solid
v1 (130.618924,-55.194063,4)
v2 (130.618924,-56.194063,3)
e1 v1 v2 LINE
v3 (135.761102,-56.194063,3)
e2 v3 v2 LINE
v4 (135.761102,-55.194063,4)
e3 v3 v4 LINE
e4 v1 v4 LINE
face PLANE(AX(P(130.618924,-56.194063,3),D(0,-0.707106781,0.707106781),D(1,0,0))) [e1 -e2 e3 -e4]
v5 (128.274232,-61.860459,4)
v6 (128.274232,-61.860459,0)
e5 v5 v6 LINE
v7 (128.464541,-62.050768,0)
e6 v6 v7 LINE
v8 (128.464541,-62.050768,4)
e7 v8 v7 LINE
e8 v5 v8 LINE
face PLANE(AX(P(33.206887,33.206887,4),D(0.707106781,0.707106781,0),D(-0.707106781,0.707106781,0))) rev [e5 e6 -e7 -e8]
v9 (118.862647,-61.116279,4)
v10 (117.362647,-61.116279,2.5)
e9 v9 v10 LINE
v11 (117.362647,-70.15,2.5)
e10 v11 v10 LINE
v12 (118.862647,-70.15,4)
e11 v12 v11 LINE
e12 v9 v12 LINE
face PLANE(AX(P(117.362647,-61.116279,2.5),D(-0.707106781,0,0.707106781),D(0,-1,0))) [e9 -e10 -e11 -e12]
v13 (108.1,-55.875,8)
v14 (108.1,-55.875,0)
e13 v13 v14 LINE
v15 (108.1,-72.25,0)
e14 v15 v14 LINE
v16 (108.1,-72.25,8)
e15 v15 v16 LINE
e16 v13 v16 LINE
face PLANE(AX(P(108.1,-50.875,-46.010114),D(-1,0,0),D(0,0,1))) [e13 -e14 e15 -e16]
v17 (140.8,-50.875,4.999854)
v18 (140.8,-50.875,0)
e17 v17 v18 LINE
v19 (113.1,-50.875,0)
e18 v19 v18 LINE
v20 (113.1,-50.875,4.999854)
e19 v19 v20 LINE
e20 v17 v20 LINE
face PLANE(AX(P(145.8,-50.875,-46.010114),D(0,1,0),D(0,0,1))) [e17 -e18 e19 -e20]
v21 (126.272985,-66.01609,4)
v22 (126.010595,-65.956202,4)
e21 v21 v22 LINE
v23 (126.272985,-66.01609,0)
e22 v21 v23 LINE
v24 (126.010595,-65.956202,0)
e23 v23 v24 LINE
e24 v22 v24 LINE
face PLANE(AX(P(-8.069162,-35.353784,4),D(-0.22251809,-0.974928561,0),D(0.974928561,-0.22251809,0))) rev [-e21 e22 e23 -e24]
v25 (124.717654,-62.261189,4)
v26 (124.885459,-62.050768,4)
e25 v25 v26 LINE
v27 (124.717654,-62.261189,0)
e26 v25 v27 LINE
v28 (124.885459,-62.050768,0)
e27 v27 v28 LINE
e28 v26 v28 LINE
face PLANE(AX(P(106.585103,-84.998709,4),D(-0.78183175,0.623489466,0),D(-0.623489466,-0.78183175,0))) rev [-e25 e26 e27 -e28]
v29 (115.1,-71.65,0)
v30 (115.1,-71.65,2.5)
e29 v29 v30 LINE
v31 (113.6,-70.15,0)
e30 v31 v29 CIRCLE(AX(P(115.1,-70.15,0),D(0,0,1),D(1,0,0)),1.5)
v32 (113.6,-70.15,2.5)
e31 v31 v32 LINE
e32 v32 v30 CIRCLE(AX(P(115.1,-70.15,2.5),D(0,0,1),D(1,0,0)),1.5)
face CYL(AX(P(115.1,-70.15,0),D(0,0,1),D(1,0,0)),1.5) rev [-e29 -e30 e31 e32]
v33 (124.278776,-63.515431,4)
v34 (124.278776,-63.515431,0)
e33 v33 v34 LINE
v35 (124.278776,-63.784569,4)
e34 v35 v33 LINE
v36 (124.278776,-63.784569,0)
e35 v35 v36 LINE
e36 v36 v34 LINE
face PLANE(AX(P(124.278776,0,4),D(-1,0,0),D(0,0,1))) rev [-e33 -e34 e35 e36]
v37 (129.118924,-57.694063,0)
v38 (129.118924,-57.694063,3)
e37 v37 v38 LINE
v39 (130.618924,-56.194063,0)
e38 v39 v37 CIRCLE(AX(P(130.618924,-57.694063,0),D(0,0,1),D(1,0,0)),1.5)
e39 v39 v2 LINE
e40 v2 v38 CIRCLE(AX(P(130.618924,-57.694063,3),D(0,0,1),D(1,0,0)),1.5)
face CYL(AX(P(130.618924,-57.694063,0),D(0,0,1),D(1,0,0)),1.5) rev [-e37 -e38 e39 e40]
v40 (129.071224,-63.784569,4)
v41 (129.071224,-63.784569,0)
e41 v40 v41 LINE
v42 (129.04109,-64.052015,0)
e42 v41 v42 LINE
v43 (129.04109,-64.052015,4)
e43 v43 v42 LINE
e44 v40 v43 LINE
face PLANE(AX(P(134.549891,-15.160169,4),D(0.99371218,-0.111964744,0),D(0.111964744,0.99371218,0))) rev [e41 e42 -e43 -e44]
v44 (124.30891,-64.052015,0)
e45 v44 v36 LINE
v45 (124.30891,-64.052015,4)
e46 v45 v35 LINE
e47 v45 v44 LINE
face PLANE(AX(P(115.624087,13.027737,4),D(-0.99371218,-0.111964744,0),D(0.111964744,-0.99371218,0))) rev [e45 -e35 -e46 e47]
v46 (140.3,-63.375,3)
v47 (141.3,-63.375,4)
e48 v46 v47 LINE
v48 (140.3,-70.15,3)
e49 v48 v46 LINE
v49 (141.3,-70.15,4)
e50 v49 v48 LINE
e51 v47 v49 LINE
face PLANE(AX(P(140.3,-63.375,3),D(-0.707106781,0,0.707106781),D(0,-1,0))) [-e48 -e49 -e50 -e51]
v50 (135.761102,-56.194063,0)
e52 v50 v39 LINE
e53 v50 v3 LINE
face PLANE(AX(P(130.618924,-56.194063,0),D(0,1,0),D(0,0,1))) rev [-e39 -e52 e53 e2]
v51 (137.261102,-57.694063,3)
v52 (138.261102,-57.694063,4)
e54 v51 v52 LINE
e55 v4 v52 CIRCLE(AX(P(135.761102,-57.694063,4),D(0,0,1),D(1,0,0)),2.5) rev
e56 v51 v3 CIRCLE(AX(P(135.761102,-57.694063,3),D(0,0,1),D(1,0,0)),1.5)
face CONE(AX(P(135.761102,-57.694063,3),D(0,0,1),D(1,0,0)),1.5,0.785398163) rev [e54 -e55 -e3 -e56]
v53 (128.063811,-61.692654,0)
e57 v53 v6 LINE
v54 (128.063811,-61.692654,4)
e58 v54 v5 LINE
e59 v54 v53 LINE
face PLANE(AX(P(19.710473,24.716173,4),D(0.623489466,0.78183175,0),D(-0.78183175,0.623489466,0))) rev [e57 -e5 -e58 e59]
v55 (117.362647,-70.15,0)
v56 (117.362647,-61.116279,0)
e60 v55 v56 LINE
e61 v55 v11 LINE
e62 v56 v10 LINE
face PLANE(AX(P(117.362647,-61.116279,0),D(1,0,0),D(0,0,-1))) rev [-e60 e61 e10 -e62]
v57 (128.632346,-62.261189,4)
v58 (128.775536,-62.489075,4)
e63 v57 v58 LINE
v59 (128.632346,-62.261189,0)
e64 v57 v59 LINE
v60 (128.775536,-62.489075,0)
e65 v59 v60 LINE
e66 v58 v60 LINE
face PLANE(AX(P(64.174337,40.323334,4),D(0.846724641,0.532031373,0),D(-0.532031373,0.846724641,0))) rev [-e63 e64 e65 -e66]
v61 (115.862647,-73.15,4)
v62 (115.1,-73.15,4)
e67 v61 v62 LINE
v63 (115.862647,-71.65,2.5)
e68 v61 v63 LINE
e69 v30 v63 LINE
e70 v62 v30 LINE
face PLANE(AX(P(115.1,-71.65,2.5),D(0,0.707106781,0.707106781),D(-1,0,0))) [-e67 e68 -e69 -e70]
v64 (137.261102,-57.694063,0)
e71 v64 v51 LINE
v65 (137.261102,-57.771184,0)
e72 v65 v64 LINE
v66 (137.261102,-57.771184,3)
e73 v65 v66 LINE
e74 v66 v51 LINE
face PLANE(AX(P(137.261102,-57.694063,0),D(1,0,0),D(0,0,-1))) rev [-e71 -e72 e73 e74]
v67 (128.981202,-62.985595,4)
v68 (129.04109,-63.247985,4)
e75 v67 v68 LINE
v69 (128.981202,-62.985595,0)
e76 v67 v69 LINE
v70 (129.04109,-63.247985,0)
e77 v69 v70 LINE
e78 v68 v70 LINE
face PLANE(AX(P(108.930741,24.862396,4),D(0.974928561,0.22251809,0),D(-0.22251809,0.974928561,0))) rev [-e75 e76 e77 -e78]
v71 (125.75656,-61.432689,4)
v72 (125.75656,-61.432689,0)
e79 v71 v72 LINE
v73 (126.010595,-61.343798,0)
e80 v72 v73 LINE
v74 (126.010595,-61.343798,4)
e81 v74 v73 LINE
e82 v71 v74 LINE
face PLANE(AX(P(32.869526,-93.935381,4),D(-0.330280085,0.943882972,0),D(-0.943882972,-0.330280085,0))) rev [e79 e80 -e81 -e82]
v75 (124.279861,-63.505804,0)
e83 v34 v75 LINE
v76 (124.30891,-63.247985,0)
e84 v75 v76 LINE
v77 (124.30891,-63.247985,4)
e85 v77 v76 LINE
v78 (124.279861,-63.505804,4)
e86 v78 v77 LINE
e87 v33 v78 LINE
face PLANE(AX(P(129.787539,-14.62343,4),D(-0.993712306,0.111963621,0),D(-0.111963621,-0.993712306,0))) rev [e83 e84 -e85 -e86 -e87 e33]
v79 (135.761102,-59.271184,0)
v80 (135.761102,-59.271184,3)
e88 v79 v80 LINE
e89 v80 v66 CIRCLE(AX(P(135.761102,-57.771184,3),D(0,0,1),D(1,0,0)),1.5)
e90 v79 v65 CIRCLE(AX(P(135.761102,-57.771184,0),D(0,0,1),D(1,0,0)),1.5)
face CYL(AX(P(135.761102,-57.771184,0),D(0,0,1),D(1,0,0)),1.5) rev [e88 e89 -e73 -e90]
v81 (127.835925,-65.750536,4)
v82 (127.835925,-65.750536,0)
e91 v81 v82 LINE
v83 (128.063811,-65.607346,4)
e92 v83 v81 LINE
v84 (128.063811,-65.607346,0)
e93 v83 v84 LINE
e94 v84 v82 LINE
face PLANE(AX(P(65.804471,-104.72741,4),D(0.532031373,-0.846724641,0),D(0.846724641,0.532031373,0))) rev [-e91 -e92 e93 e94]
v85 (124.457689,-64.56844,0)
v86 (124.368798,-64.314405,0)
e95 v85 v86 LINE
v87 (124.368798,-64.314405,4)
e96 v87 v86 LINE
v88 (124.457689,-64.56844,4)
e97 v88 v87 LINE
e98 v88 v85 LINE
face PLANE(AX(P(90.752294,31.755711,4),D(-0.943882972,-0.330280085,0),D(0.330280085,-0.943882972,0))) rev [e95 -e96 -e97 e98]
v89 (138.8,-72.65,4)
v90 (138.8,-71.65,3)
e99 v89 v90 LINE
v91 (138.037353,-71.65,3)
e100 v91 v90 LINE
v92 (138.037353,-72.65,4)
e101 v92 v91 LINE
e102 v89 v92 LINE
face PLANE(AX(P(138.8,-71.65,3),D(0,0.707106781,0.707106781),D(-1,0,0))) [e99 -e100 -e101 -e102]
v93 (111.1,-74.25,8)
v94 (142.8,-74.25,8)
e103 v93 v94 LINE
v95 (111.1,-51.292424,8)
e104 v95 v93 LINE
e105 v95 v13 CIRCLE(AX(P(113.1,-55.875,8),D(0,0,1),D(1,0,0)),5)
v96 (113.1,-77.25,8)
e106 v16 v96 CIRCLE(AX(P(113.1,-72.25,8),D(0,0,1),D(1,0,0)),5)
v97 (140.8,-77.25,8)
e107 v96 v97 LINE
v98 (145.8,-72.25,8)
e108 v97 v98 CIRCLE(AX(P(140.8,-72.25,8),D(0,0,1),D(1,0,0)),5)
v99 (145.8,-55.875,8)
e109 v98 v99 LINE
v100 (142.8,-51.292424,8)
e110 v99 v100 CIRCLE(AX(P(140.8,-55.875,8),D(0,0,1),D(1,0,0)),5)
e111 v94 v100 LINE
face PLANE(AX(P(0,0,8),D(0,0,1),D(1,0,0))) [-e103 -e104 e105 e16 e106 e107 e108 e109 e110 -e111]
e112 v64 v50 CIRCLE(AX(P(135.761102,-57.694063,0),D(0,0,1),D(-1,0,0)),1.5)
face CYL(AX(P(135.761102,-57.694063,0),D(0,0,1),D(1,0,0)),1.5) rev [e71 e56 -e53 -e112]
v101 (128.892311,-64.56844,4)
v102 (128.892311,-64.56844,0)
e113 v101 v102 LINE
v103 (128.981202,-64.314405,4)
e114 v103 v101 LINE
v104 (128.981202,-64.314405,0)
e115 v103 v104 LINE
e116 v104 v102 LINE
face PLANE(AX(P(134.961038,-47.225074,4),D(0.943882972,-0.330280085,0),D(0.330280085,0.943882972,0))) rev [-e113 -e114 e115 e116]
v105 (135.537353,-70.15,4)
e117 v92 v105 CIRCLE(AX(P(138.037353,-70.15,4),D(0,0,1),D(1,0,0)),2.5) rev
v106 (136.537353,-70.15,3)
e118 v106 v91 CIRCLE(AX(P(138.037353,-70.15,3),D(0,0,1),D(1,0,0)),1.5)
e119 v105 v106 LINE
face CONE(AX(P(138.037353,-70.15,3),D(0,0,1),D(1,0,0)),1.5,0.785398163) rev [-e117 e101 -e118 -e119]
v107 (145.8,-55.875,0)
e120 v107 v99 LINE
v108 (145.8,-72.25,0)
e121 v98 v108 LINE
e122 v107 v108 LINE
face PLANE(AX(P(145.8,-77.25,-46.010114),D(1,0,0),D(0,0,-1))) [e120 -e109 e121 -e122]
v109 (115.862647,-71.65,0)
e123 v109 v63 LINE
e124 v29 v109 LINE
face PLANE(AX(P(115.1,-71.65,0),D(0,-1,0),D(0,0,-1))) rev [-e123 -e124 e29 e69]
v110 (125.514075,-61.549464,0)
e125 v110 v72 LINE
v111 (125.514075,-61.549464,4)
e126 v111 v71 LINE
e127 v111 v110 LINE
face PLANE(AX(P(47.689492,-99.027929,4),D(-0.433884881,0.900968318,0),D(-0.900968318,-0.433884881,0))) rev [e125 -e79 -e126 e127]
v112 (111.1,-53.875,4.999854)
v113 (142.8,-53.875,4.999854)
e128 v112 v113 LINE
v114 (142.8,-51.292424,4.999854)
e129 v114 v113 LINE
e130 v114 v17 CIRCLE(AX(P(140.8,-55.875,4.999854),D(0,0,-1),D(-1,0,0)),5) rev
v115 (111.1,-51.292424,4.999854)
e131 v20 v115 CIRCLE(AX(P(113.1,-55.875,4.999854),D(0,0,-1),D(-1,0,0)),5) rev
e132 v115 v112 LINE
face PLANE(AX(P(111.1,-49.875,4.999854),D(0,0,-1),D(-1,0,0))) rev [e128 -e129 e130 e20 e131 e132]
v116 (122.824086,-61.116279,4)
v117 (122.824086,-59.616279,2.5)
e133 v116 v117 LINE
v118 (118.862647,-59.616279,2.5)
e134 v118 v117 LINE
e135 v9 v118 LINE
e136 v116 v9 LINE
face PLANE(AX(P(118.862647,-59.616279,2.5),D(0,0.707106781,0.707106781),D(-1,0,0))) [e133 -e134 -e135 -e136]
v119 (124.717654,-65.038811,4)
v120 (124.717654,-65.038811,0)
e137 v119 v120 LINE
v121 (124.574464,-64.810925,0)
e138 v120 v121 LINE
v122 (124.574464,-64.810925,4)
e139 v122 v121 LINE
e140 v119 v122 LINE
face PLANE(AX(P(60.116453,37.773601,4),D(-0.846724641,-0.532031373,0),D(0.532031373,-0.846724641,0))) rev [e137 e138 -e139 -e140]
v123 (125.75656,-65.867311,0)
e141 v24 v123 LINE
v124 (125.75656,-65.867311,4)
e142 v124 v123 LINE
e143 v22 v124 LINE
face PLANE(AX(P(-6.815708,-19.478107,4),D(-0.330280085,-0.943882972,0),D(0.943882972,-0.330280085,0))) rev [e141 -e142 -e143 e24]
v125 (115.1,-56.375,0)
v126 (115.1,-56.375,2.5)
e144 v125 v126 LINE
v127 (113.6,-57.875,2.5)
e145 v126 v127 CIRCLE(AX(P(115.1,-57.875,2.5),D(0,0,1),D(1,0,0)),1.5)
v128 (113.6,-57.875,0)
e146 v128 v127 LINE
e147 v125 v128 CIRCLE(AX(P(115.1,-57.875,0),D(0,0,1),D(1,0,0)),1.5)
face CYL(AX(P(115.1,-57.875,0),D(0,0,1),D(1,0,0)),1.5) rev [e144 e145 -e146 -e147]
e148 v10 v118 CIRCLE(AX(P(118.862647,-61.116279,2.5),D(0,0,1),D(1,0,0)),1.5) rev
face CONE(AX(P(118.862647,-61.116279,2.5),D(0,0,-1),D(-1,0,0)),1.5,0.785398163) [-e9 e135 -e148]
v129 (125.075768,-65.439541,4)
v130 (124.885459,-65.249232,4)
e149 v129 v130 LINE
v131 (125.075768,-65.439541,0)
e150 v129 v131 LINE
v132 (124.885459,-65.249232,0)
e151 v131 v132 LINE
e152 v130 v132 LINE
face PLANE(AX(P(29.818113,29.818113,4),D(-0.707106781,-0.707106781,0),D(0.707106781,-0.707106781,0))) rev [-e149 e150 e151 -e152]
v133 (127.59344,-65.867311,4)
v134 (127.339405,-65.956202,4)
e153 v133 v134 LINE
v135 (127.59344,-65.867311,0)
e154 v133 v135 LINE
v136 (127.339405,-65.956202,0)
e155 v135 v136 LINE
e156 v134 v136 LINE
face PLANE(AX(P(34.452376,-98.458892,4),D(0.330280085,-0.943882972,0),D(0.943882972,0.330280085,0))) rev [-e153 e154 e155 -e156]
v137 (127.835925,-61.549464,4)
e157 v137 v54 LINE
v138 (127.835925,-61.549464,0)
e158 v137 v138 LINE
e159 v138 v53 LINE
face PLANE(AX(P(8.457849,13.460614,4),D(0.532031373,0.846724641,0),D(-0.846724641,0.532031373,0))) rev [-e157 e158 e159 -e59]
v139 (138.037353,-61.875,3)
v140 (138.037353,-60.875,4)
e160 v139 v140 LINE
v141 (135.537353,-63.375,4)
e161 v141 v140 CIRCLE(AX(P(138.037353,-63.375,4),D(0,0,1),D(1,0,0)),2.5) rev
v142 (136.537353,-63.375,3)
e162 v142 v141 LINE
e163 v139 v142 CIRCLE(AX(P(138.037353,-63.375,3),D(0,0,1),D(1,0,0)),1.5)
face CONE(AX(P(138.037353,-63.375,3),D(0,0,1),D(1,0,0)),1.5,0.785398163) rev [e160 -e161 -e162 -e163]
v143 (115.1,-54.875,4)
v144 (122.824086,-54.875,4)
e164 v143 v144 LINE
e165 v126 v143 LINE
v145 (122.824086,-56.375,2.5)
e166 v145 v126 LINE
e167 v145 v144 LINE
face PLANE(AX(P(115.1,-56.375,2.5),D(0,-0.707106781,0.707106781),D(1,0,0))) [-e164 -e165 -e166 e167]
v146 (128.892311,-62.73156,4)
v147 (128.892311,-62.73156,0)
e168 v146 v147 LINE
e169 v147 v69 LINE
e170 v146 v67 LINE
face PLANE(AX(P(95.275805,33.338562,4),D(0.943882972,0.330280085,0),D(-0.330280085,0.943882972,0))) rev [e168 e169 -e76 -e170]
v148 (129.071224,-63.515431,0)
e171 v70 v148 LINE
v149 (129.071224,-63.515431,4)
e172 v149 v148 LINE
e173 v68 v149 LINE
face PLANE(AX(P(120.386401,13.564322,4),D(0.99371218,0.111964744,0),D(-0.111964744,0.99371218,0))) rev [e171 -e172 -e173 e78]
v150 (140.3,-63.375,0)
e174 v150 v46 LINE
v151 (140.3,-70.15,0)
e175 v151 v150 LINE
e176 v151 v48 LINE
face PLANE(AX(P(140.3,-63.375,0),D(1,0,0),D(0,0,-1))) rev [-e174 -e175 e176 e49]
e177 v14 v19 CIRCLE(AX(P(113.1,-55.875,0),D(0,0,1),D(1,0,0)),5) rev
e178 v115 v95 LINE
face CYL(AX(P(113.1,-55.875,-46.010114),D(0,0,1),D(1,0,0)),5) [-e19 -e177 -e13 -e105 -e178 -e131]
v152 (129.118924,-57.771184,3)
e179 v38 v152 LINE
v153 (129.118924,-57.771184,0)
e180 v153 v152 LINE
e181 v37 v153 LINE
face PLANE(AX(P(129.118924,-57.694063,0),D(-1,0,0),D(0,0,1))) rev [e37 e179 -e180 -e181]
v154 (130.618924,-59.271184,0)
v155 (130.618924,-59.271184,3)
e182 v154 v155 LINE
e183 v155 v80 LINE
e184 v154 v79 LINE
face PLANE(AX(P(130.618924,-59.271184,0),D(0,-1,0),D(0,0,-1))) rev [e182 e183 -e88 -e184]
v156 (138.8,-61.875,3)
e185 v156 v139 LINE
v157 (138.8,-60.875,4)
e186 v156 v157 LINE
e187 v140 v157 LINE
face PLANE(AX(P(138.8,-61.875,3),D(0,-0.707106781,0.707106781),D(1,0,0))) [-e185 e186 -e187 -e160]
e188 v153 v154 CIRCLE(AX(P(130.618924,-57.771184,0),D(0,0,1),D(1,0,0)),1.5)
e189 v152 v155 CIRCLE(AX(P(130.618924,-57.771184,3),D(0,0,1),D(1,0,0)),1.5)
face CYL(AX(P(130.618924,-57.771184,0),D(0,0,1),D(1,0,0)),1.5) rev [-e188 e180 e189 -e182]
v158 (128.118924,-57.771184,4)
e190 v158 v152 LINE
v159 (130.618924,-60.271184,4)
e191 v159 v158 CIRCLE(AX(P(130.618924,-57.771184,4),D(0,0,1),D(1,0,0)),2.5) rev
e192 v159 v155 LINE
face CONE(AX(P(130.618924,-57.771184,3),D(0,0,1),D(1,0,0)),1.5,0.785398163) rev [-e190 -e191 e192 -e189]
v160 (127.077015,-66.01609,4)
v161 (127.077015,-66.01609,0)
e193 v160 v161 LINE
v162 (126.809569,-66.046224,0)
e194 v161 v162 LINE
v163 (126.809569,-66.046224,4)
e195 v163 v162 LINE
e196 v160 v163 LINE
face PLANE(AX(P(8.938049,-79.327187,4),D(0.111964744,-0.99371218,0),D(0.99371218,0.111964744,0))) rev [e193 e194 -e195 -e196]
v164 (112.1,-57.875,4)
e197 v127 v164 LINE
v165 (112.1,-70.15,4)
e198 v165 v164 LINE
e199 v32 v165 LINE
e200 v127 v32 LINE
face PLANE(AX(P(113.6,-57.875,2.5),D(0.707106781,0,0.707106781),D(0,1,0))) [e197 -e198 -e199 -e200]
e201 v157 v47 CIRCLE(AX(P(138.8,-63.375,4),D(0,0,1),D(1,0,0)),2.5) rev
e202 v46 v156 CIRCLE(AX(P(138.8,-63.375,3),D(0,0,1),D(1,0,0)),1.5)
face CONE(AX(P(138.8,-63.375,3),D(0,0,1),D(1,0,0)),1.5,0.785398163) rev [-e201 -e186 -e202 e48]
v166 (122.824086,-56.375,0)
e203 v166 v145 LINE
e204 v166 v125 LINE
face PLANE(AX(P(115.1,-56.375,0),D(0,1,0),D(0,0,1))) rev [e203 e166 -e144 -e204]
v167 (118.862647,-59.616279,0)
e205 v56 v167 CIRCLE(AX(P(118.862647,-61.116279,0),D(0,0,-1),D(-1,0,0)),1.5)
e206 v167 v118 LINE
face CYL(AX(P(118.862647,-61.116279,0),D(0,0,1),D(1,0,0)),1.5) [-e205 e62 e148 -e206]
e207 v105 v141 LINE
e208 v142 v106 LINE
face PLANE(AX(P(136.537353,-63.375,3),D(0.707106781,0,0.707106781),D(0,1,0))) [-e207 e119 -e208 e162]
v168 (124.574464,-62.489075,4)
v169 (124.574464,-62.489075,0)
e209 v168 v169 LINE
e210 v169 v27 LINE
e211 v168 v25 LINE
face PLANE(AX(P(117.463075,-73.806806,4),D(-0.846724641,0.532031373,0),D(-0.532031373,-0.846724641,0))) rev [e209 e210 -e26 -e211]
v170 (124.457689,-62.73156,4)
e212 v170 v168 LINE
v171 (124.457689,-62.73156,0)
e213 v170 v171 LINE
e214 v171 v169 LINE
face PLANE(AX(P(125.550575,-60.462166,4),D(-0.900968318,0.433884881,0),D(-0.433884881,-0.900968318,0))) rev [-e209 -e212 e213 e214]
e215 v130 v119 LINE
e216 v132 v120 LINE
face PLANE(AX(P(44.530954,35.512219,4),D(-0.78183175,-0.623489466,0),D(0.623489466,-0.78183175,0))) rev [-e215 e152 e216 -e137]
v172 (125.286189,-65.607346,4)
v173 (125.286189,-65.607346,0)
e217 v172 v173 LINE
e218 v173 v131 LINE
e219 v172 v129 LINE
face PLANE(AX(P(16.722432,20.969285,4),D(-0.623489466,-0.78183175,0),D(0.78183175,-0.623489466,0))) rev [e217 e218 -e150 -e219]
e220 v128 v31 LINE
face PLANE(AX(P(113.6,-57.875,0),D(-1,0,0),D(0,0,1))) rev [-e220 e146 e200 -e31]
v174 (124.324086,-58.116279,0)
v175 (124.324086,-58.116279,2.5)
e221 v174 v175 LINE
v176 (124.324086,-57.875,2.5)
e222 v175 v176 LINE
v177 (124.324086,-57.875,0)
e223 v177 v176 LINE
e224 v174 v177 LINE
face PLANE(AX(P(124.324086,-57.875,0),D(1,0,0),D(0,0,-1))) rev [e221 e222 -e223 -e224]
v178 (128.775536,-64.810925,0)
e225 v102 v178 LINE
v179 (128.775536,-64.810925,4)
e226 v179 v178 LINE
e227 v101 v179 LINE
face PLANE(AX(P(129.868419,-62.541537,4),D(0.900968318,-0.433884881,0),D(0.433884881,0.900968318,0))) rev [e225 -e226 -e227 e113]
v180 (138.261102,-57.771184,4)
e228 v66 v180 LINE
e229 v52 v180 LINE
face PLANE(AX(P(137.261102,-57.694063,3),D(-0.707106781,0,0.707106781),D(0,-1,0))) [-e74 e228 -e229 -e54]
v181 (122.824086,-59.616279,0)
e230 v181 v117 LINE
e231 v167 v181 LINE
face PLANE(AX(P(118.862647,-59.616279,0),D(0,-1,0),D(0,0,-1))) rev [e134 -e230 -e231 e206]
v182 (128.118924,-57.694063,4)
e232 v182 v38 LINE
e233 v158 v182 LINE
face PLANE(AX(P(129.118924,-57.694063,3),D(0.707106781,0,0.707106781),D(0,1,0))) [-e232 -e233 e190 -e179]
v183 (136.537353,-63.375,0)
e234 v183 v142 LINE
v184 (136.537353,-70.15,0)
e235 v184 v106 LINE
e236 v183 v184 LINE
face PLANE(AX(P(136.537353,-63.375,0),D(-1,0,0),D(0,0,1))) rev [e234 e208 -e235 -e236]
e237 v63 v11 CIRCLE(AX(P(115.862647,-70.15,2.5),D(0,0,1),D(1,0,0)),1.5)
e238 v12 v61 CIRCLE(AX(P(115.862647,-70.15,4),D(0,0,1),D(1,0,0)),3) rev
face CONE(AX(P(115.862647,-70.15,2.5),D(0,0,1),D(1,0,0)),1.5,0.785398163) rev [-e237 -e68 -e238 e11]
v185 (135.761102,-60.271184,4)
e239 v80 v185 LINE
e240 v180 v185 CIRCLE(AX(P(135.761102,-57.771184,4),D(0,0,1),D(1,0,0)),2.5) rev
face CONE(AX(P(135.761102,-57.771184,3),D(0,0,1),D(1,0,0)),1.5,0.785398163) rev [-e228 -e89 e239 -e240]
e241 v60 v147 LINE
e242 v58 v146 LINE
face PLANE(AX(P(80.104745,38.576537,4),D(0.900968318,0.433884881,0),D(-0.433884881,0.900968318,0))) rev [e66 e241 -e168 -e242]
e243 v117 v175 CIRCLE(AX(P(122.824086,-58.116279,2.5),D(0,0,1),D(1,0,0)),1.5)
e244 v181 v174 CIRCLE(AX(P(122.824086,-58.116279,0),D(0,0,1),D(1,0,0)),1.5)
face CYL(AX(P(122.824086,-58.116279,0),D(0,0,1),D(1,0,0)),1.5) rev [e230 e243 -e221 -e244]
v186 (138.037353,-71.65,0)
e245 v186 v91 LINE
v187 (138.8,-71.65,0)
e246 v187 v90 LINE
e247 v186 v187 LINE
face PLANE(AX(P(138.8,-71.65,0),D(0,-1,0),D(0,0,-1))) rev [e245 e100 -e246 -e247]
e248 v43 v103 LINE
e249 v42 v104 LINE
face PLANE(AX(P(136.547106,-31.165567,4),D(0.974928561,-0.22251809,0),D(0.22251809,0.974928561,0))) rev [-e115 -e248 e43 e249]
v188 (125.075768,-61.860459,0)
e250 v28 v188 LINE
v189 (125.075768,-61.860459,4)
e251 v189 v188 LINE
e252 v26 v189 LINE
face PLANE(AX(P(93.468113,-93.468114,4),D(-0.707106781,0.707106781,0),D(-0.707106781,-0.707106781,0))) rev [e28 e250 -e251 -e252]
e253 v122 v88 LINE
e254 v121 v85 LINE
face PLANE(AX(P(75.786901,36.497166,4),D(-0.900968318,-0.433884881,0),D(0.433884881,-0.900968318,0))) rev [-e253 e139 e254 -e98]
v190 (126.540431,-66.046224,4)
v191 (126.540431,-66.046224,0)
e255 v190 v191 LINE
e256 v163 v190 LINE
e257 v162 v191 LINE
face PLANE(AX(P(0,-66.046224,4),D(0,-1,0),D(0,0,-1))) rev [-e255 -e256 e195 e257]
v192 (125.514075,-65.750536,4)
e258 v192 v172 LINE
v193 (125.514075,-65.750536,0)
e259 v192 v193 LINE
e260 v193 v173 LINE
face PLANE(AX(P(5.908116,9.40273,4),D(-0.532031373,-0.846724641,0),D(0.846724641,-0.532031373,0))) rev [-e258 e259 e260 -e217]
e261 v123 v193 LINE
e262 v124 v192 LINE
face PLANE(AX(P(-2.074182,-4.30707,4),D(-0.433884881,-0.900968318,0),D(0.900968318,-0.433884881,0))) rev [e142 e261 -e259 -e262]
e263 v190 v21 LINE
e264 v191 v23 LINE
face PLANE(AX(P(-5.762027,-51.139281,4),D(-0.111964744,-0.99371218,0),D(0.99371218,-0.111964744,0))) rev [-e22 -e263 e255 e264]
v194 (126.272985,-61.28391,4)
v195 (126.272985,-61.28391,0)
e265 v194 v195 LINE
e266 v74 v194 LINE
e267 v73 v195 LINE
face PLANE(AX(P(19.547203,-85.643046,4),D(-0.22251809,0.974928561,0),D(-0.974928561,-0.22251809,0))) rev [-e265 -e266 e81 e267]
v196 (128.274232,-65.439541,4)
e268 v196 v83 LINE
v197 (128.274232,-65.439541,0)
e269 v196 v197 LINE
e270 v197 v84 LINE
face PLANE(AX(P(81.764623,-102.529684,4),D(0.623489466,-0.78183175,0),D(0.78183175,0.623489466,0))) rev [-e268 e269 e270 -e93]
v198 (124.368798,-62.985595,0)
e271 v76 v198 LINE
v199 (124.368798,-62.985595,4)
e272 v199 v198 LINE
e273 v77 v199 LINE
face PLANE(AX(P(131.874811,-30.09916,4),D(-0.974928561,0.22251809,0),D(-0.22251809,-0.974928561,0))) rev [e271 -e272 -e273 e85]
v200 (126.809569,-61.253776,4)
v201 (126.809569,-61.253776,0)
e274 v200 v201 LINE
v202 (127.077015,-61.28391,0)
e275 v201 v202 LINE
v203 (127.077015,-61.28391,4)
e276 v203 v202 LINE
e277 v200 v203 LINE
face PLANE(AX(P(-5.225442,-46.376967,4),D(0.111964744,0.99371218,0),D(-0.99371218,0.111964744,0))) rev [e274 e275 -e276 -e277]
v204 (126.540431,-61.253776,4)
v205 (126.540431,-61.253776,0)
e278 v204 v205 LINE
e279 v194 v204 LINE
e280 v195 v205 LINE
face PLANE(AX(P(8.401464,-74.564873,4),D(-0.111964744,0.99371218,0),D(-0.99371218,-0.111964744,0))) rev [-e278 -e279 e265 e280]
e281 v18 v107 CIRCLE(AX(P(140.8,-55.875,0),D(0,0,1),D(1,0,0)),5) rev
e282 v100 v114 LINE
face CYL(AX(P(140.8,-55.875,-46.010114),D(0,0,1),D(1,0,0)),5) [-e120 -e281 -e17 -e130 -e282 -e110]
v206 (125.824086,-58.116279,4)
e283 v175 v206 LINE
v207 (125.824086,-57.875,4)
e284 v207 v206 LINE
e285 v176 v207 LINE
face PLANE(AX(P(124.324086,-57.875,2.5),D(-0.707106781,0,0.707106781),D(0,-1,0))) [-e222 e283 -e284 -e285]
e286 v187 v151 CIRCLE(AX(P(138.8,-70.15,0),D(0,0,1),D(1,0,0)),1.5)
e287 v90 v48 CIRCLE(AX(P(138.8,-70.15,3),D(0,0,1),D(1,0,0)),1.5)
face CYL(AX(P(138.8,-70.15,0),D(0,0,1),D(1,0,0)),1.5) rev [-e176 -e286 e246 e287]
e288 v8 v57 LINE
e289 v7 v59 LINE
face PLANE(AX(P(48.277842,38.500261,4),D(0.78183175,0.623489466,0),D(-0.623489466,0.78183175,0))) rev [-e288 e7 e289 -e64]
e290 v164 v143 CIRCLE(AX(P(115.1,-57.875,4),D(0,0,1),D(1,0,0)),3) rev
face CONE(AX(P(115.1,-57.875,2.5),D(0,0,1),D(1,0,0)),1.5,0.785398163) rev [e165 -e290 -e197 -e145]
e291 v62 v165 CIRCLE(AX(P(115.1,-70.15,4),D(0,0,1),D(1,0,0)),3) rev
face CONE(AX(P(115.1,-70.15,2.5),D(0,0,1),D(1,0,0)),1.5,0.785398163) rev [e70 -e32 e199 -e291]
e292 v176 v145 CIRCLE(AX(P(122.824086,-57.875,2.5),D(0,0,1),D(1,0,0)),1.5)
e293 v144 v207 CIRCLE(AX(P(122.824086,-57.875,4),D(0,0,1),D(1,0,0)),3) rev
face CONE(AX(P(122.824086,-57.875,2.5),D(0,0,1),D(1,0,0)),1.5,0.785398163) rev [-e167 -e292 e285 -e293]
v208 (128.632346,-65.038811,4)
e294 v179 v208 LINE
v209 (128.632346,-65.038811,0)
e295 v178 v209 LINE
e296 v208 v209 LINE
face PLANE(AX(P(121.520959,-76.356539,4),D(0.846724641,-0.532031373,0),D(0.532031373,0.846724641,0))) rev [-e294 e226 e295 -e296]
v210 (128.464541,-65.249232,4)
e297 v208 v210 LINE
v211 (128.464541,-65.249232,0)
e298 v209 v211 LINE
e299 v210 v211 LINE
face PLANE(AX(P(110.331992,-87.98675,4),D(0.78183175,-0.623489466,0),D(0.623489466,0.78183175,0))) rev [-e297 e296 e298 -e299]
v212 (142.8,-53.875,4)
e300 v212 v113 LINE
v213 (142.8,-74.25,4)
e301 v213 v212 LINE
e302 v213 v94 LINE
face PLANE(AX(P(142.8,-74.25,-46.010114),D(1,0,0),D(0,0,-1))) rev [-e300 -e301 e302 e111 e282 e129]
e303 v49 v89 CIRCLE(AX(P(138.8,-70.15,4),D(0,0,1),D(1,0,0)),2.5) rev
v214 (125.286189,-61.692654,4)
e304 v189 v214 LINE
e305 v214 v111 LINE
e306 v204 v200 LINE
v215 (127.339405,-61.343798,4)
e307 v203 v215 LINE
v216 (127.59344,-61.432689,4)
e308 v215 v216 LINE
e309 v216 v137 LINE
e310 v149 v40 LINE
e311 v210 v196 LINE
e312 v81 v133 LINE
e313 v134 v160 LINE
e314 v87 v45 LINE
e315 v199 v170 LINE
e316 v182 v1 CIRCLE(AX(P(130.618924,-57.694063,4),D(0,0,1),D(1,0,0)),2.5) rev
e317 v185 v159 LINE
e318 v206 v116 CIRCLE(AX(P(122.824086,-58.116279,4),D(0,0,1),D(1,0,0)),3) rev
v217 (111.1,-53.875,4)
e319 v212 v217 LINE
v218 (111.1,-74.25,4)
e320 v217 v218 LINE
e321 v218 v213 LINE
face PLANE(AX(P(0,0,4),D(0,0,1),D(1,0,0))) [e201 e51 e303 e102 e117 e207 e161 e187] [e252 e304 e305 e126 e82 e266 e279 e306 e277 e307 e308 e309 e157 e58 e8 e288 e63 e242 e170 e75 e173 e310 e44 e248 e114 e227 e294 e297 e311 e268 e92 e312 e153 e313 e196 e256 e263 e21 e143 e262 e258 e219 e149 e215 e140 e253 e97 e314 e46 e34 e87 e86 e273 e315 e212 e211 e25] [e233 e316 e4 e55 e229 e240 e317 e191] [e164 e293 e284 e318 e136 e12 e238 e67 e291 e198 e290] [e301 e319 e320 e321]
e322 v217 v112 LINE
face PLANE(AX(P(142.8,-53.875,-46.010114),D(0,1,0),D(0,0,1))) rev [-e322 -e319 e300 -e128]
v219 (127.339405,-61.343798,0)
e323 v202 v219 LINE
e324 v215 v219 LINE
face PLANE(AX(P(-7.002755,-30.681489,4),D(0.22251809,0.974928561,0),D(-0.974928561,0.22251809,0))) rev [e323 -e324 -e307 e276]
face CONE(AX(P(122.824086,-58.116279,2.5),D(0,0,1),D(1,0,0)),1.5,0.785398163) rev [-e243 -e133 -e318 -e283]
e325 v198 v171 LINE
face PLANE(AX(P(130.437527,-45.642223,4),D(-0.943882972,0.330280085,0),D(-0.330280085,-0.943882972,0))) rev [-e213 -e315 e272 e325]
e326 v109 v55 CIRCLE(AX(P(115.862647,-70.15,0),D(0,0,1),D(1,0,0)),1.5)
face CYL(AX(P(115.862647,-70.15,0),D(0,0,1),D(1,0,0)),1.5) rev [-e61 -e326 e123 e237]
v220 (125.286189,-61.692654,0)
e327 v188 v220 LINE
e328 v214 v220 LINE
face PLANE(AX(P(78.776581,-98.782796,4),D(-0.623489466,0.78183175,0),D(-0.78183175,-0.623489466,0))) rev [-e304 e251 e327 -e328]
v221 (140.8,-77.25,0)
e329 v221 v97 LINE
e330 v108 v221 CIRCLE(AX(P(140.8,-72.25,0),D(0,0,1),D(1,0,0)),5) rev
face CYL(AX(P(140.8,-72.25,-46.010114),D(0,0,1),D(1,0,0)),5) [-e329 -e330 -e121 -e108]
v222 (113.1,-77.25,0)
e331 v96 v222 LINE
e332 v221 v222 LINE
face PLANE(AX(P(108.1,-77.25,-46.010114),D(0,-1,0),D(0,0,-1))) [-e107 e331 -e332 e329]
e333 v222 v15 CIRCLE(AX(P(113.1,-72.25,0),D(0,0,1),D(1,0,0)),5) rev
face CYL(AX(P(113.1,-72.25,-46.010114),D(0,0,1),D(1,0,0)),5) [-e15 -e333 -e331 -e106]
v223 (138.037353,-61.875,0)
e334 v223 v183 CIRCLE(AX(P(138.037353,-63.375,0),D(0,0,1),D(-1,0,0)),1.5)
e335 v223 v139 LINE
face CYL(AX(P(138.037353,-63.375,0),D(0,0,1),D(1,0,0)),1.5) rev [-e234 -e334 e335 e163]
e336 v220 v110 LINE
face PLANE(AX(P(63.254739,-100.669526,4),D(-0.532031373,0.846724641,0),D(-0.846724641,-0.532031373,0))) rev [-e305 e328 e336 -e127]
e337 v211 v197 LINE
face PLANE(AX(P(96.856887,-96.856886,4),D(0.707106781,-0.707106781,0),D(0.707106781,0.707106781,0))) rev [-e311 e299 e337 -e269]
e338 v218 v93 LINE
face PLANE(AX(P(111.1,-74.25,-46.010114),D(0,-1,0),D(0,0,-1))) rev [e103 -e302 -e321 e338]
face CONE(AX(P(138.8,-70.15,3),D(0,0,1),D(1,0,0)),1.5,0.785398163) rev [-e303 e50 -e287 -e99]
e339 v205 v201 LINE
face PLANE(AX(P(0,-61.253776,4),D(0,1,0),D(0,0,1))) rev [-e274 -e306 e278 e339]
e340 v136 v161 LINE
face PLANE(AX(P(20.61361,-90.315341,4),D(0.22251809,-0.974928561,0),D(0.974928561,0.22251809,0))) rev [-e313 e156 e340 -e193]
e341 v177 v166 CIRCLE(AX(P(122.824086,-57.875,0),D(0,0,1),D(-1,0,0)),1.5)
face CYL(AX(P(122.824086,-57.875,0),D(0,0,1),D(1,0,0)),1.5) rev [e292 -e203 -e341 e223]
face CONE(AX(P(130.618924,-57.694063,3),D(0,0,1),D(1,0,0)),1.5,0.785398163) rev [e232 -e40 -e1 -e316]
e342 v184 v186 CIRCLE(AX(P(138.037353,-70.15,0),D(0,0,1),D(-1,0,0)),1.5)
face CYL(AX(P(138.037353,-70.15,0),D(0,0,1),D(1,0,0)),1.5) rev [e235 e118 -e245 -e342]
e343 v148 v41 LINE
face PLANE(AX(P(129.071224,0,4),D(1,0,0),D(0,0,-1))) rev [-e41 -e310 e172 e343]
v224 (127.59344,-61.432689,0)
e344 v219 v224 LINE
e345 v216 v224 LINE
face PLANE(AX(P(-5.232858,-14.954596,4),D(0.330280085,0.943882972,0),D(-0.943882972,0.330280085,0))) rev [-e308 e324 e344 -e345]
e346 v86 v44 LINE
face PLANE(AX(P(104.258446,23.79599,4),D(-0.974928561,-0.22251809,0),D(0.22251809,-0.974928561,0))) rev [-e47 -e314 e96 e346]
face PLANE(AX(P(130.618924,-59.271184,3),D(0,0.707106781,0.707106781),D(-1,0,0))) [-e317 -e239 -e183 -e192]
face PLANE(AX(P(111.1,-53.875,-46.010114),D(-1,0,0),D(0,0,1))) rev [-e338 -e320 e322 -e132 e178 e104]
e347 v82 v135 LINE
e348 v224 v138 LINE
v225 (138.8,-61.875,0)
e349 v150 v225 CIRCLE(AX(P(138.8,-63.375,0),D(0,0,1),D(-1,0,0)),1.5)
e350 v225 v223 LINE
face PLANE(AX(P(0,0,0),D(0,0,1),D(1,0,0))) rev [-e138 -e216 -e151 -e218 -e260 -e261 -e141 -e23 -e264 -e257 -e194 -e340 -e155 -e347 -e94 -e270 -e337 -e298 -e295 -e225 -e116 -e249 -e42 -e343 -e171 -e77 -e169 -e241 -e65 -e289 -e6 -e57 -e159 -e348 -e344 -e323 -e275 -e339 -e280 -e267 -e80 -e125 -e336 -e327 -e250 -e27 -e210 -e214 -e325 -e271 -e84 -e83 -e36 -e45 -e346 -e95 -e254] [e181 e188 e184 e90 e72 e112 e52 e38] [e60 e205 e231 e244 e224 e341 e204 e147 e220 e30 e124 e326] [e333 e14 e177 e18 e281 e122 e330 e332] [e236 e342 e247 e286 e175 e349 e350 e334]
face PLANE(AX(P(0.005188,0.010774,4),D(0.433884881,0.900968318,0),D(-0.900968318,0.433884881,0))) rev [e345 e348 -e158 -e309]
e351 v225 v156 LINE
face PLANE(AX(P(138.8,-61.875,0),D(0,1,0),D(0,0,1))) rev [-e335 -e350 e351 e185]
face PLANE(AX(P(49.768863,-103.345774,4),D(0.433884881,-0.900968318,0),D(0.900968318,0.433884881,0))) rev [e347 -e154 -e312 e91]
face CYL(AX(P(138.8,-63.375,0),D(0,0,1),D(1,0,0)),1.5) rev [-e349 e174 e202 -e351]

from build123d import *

# Parameters (mm, degrees)
MODEL_W                      = 31.7
MODEL_H                      = 20.375
SALIENTE_EXTRUIR1_DEPTH      = 4
SALIENTE_EXTRUIR2_DEPTH      = 4
SALIENTE_EXTRUIR2_DEPTH_BACK = 4
CROQUIS3_W                   = 37.7
CROQUIS3_H                   = 26.375
CROQUIS3_W_2                 = 31.7
CROQUIS3_H_2                 = 20.375
REDONDEO1_R                  = 5
REDONDEO3_R                  = 5
CROQUIS8_W                   = 31.7
CROQUIS8_H                   = 3.000145556
CORTAR_EXTRUIR2_DEPTH        = 4
CORTAR_EXTRUIR3_DEPTH        = 4
CHAFL_N3_SIZE                = 1.5
CHAFL_N4_SIZE                = 1


with BuildPart() as part:
    # Model → Saliente-Extruir1 (new body)
    with BuildSketch(Plane.XY):
        with Locations((126.95, -64.0625)):
            Rectangle(MODEL_W, MODEL_H)
        Polygon((126.809569, -61.253776), (127.077015, -61.28391), (127.339405, -61.343798), (127.59344, -61.432689), (127.835925, -61.549464), (128.063811, -61.692654), (128.274232, -61.860459), (128.464541, -62.050768), (128.632346, -62.261189), (128.775536, -62.489075), (128.892311, -62.73156), (128.981202, -62.985595), (129.04109, -63.247985), (129.071224, -63.515431), (129.071224, -63.784569), (129.04109, -64.052015), (128.981202, -64.314405), (128.892311, -64.56844), (128.775536, -64.810925), (128.632346, -65.038811), (128.464541, -65.249232), (128.274232, -65.439541), (128.063811, -65.607346), (127.835925, -65.750536), (127.59344, -65.867311), (127.339405, -65.956202), (127.077015, -66.01609), (126.809569, -66.046224), (126.540431, -66.046224), (126.272985, -66.01609), (126.010595, -65.956202), (125.75656, -65.867311), (125.514075, -65.750536), (125.286189, -65.607346), (125.075768, -65.439541), (124.885459, -65.249232), (124.717654, -65.038811), (124.574464, -64.810925), (124.457689, -64.56844), (124.368798, -64.314405), (124.30891, -64.052015), (124.278776, -63.784569), (124.278776, -63.515431), (124.279861, -63.505804), (124.30891, -63.247985), (124.368798, -62.985595), (124.457689, -62.73156), (124.574464, -62.489075), (124.717654, -62.261189), (124.885459, -62.050768), (125.075768, -61.860459), (125.286189, -61.692654), (125.514075, -61.549464), (125.75656, -61.432689), (126.010595, -61.343798), (126.272985, -61.28391), (126.540431, -61.253776), align=None, mode=Mode.SUBTRACT)
    extrude(amount=SALIENTE_EXTRUIR1_DEPTH)

    # Croquis3 → Saliente-Extruir2 (add, two sides: drawn at the far end of the back side and taken through both)
    with BuildSketch(Plane.XY.offset(4).offset(-SALIENTE_EXTRUIR2_DEPTH_BACK)):
        with Locations((126.95, -64.0625)):
            Rectangle(CROQUIS3_W, CROQUIS3_H)
        with Locations((126.95, -64.0625)):
            Rectangle(CROQUIS3_W_2, CROQUIS3_H_2, mode=Mode.SUBTRACT)
    extrude(amount=SALIENTE_EXTRUIR2_DEPTH + SALIENTE_EXTRUIR2_DEPTH_BACK)

    # Redondeo1
    redondeo1_edges = [part.edges().sort_by_distance(p)[0] for p in [
        (108.1, -77.25, 4),
        (145.8, -77.25, 4),
    ]]
    fillet(redondeo1_edges, radius=REDONDEO1_R)

    # Redondeo3
    redondeo3_edges = [part.edges().sort_by_distance(p)[0] for p in [
        (145.8, -50.875, 4),
        (108.1, -50.875, 4),
    ]]
    fillet(redondeo3_edges, radius=REDONDEO3_R)

    # Croquis8 → Cortar-Extruir2 (cut)
    with BuildSketch(Plane.XZ.offset(53.875)):
        with Locations((126.95, 6.499927222)):
            Rectangle(CROQUIS8_W, CROQUIS8_H)
    extrude(amount=-CORTAR_EXTRUIR2_DEPTH, mode=Mode.SUBTRACT)

    # Croquis9 → Cortar-Extruir3 (cut)
    with BuildSketch(Plane.XY.offset(4)):
        with BuildLine():
            Line((115.1, -56.375), (118.625993534, -56.375))
            Line((118.625993534, -56.375), (122.824085816, -56.375))
            ThreePointArc((122.824085816, -56.375), (123.884745987, -56.814339828), (124.324085816, -57.875))
            Line((124.324085816, -57.875), (124.324085816, -58.116279303))
            ThreePointArc((124.324085816, -58.116279303), (123.884745987, -59.176939475), (122.824085816, -59.616279303))
            Line((122.824085816, -59.616279303), (118.862646904, -59.616279303))
            ThreePointArc((118.862646904, -59.616279303), (117.801986732, -60.055619131), (117.362646904, -61.116279303))
            Line((117.362646904, -61.116279303), (117.362646904, -70.15))
            ThreePointArc((117.362646904, -70.15), (116.923307076, -71.210660172), (115.862646904, -71.65))
            Line((115.862646904, -71.65), (115.1, -71.65))
            ThreePointArc((115.1, -71.65), (114.039339828, -71.210660172), (113.6, -70.15))
            Line((113.6, -70.15), (113.6, -57.875))
            ThreePointArc((113.6, -57.875), (114.039339828, -56.814339828), (115.1, -56.375))
        make_face()
        with BuildLine():
            Line((138.8, -71.65), (138.037353096, -71.65))
            ThreePointArc((138.037353096, -71.65), (136.976692924, -71.210660172), (136.537353096, -70.15))
            Line((136.537353096, -70.15), (136.537353096, -63.375))
            ThreePointArc((136.537353096, -63.375), (136.976692924, -62.314339828), (138.037353096, -61.875))
            Line((138.037353096, -61.875), (138.8, -61.875))
            ThreePointArc((138.8, -61.875), (139.860660172, -62.314339828), (140.3, -63.375))
            Line((140.3, -63.375), (140.3, -70.15))
            ThreePointArc((140.3, -70.15), (139.860660172, -71.210660172), (138.8, -71.65))
        make_face()
        with BuildLine():
            Line((130.618924081, -56.194062707), (135.761102268, -56.194062707))
            ThreePointArc((135.761102268, -56.194062707), (136.82176244, -56.633402535), (137.261102268, -57.694062707))
            Line((137.261102268, -57.694062707), (137.261102268, -57.771184154))
            ThreePointArc((137.261102268, -57.771184154), (136.82176244, -58.831844326), (135.761102268, -59.271184154))
            Line((135.761102268, -59.271184154), (130.618924081, -59.271184154))
            ThreePointArc((130.618924081, -59.271184154), (129.55826391, -58.831844326), (129.118924081, -57.771184154))
            Line((129.118924081, -57.771184154), (129.118924081, -57.694062707))
            ThreePointArc((129.118924081, -57.694062707), (129.55826391, -56.633402535), (130.618924081, -56.194062707))
        make_face()
    extrude(amount=-CORTAR_EXTRUIR3_DEPTH, mode=Mode.SUBTRACT)

    # Chaflán3
    chafl_n3_edges = [part.edges().sort_by_distance(p)[0] for p in [
        (123.884745987, -56.814339828, 4),
        (118.962042908, -56.375, 4),
        (114.039339828, -56.814339828, 4),
        (113.6, -64.0125, 4),
        (114.039339828, -71.210660172, 4),
        (115.481323452, -71.65, 4),
        (116.923307076, -71.210660172, 4),
        (117.362646904, -65.633139651, 4),
        (117.801986732, -60.055619131, 4),
        (120.84336636, -59.616279303, 4),
        (123.884745987, -59.176939475, 4),
        (124.324085816, -57.995639651, 4),
    ]]
    chamfer(chafl_n3_edges, length=CHAFL_N3_SIZE - 0.0001)  # a hair under: the kernel refuses the full size

    # Chaflán4
    chafl_n4_edges = [part.edges().sort_by_distance(p)[0] for p in [
        (139.860660172, -71.210660172, 4),
        (140.3, -66.7625, 4),
        (139.860660172, -62.314339828, 4),
        (138.418676548, -61.875, 4),
        (136.976692924, -62.314339828, 4),
        (136.537353096, -66.7625, 4),
        (136.976692924, -71.210660172, 4),
        (138.418676548, -71.65, 4),
        (136.82176244, -58.831844326, 4),
        (137.261102268, -57.73262343, 4),
        (136.82176244, -56.633402535, 4),
        (133.190013175, -56.194062707, 4),
        (129.55826391, -56.633402535, 4),
        (129.118924081, -57.73262343, 4),
        (129.55826391, -58.831844326, 4),
        (133.190013175, -59.271184154, 4),
    ]]
    chamfer(chafl_n4_edges, length=CHAFL_N4_SIZE)


solid = part.part
